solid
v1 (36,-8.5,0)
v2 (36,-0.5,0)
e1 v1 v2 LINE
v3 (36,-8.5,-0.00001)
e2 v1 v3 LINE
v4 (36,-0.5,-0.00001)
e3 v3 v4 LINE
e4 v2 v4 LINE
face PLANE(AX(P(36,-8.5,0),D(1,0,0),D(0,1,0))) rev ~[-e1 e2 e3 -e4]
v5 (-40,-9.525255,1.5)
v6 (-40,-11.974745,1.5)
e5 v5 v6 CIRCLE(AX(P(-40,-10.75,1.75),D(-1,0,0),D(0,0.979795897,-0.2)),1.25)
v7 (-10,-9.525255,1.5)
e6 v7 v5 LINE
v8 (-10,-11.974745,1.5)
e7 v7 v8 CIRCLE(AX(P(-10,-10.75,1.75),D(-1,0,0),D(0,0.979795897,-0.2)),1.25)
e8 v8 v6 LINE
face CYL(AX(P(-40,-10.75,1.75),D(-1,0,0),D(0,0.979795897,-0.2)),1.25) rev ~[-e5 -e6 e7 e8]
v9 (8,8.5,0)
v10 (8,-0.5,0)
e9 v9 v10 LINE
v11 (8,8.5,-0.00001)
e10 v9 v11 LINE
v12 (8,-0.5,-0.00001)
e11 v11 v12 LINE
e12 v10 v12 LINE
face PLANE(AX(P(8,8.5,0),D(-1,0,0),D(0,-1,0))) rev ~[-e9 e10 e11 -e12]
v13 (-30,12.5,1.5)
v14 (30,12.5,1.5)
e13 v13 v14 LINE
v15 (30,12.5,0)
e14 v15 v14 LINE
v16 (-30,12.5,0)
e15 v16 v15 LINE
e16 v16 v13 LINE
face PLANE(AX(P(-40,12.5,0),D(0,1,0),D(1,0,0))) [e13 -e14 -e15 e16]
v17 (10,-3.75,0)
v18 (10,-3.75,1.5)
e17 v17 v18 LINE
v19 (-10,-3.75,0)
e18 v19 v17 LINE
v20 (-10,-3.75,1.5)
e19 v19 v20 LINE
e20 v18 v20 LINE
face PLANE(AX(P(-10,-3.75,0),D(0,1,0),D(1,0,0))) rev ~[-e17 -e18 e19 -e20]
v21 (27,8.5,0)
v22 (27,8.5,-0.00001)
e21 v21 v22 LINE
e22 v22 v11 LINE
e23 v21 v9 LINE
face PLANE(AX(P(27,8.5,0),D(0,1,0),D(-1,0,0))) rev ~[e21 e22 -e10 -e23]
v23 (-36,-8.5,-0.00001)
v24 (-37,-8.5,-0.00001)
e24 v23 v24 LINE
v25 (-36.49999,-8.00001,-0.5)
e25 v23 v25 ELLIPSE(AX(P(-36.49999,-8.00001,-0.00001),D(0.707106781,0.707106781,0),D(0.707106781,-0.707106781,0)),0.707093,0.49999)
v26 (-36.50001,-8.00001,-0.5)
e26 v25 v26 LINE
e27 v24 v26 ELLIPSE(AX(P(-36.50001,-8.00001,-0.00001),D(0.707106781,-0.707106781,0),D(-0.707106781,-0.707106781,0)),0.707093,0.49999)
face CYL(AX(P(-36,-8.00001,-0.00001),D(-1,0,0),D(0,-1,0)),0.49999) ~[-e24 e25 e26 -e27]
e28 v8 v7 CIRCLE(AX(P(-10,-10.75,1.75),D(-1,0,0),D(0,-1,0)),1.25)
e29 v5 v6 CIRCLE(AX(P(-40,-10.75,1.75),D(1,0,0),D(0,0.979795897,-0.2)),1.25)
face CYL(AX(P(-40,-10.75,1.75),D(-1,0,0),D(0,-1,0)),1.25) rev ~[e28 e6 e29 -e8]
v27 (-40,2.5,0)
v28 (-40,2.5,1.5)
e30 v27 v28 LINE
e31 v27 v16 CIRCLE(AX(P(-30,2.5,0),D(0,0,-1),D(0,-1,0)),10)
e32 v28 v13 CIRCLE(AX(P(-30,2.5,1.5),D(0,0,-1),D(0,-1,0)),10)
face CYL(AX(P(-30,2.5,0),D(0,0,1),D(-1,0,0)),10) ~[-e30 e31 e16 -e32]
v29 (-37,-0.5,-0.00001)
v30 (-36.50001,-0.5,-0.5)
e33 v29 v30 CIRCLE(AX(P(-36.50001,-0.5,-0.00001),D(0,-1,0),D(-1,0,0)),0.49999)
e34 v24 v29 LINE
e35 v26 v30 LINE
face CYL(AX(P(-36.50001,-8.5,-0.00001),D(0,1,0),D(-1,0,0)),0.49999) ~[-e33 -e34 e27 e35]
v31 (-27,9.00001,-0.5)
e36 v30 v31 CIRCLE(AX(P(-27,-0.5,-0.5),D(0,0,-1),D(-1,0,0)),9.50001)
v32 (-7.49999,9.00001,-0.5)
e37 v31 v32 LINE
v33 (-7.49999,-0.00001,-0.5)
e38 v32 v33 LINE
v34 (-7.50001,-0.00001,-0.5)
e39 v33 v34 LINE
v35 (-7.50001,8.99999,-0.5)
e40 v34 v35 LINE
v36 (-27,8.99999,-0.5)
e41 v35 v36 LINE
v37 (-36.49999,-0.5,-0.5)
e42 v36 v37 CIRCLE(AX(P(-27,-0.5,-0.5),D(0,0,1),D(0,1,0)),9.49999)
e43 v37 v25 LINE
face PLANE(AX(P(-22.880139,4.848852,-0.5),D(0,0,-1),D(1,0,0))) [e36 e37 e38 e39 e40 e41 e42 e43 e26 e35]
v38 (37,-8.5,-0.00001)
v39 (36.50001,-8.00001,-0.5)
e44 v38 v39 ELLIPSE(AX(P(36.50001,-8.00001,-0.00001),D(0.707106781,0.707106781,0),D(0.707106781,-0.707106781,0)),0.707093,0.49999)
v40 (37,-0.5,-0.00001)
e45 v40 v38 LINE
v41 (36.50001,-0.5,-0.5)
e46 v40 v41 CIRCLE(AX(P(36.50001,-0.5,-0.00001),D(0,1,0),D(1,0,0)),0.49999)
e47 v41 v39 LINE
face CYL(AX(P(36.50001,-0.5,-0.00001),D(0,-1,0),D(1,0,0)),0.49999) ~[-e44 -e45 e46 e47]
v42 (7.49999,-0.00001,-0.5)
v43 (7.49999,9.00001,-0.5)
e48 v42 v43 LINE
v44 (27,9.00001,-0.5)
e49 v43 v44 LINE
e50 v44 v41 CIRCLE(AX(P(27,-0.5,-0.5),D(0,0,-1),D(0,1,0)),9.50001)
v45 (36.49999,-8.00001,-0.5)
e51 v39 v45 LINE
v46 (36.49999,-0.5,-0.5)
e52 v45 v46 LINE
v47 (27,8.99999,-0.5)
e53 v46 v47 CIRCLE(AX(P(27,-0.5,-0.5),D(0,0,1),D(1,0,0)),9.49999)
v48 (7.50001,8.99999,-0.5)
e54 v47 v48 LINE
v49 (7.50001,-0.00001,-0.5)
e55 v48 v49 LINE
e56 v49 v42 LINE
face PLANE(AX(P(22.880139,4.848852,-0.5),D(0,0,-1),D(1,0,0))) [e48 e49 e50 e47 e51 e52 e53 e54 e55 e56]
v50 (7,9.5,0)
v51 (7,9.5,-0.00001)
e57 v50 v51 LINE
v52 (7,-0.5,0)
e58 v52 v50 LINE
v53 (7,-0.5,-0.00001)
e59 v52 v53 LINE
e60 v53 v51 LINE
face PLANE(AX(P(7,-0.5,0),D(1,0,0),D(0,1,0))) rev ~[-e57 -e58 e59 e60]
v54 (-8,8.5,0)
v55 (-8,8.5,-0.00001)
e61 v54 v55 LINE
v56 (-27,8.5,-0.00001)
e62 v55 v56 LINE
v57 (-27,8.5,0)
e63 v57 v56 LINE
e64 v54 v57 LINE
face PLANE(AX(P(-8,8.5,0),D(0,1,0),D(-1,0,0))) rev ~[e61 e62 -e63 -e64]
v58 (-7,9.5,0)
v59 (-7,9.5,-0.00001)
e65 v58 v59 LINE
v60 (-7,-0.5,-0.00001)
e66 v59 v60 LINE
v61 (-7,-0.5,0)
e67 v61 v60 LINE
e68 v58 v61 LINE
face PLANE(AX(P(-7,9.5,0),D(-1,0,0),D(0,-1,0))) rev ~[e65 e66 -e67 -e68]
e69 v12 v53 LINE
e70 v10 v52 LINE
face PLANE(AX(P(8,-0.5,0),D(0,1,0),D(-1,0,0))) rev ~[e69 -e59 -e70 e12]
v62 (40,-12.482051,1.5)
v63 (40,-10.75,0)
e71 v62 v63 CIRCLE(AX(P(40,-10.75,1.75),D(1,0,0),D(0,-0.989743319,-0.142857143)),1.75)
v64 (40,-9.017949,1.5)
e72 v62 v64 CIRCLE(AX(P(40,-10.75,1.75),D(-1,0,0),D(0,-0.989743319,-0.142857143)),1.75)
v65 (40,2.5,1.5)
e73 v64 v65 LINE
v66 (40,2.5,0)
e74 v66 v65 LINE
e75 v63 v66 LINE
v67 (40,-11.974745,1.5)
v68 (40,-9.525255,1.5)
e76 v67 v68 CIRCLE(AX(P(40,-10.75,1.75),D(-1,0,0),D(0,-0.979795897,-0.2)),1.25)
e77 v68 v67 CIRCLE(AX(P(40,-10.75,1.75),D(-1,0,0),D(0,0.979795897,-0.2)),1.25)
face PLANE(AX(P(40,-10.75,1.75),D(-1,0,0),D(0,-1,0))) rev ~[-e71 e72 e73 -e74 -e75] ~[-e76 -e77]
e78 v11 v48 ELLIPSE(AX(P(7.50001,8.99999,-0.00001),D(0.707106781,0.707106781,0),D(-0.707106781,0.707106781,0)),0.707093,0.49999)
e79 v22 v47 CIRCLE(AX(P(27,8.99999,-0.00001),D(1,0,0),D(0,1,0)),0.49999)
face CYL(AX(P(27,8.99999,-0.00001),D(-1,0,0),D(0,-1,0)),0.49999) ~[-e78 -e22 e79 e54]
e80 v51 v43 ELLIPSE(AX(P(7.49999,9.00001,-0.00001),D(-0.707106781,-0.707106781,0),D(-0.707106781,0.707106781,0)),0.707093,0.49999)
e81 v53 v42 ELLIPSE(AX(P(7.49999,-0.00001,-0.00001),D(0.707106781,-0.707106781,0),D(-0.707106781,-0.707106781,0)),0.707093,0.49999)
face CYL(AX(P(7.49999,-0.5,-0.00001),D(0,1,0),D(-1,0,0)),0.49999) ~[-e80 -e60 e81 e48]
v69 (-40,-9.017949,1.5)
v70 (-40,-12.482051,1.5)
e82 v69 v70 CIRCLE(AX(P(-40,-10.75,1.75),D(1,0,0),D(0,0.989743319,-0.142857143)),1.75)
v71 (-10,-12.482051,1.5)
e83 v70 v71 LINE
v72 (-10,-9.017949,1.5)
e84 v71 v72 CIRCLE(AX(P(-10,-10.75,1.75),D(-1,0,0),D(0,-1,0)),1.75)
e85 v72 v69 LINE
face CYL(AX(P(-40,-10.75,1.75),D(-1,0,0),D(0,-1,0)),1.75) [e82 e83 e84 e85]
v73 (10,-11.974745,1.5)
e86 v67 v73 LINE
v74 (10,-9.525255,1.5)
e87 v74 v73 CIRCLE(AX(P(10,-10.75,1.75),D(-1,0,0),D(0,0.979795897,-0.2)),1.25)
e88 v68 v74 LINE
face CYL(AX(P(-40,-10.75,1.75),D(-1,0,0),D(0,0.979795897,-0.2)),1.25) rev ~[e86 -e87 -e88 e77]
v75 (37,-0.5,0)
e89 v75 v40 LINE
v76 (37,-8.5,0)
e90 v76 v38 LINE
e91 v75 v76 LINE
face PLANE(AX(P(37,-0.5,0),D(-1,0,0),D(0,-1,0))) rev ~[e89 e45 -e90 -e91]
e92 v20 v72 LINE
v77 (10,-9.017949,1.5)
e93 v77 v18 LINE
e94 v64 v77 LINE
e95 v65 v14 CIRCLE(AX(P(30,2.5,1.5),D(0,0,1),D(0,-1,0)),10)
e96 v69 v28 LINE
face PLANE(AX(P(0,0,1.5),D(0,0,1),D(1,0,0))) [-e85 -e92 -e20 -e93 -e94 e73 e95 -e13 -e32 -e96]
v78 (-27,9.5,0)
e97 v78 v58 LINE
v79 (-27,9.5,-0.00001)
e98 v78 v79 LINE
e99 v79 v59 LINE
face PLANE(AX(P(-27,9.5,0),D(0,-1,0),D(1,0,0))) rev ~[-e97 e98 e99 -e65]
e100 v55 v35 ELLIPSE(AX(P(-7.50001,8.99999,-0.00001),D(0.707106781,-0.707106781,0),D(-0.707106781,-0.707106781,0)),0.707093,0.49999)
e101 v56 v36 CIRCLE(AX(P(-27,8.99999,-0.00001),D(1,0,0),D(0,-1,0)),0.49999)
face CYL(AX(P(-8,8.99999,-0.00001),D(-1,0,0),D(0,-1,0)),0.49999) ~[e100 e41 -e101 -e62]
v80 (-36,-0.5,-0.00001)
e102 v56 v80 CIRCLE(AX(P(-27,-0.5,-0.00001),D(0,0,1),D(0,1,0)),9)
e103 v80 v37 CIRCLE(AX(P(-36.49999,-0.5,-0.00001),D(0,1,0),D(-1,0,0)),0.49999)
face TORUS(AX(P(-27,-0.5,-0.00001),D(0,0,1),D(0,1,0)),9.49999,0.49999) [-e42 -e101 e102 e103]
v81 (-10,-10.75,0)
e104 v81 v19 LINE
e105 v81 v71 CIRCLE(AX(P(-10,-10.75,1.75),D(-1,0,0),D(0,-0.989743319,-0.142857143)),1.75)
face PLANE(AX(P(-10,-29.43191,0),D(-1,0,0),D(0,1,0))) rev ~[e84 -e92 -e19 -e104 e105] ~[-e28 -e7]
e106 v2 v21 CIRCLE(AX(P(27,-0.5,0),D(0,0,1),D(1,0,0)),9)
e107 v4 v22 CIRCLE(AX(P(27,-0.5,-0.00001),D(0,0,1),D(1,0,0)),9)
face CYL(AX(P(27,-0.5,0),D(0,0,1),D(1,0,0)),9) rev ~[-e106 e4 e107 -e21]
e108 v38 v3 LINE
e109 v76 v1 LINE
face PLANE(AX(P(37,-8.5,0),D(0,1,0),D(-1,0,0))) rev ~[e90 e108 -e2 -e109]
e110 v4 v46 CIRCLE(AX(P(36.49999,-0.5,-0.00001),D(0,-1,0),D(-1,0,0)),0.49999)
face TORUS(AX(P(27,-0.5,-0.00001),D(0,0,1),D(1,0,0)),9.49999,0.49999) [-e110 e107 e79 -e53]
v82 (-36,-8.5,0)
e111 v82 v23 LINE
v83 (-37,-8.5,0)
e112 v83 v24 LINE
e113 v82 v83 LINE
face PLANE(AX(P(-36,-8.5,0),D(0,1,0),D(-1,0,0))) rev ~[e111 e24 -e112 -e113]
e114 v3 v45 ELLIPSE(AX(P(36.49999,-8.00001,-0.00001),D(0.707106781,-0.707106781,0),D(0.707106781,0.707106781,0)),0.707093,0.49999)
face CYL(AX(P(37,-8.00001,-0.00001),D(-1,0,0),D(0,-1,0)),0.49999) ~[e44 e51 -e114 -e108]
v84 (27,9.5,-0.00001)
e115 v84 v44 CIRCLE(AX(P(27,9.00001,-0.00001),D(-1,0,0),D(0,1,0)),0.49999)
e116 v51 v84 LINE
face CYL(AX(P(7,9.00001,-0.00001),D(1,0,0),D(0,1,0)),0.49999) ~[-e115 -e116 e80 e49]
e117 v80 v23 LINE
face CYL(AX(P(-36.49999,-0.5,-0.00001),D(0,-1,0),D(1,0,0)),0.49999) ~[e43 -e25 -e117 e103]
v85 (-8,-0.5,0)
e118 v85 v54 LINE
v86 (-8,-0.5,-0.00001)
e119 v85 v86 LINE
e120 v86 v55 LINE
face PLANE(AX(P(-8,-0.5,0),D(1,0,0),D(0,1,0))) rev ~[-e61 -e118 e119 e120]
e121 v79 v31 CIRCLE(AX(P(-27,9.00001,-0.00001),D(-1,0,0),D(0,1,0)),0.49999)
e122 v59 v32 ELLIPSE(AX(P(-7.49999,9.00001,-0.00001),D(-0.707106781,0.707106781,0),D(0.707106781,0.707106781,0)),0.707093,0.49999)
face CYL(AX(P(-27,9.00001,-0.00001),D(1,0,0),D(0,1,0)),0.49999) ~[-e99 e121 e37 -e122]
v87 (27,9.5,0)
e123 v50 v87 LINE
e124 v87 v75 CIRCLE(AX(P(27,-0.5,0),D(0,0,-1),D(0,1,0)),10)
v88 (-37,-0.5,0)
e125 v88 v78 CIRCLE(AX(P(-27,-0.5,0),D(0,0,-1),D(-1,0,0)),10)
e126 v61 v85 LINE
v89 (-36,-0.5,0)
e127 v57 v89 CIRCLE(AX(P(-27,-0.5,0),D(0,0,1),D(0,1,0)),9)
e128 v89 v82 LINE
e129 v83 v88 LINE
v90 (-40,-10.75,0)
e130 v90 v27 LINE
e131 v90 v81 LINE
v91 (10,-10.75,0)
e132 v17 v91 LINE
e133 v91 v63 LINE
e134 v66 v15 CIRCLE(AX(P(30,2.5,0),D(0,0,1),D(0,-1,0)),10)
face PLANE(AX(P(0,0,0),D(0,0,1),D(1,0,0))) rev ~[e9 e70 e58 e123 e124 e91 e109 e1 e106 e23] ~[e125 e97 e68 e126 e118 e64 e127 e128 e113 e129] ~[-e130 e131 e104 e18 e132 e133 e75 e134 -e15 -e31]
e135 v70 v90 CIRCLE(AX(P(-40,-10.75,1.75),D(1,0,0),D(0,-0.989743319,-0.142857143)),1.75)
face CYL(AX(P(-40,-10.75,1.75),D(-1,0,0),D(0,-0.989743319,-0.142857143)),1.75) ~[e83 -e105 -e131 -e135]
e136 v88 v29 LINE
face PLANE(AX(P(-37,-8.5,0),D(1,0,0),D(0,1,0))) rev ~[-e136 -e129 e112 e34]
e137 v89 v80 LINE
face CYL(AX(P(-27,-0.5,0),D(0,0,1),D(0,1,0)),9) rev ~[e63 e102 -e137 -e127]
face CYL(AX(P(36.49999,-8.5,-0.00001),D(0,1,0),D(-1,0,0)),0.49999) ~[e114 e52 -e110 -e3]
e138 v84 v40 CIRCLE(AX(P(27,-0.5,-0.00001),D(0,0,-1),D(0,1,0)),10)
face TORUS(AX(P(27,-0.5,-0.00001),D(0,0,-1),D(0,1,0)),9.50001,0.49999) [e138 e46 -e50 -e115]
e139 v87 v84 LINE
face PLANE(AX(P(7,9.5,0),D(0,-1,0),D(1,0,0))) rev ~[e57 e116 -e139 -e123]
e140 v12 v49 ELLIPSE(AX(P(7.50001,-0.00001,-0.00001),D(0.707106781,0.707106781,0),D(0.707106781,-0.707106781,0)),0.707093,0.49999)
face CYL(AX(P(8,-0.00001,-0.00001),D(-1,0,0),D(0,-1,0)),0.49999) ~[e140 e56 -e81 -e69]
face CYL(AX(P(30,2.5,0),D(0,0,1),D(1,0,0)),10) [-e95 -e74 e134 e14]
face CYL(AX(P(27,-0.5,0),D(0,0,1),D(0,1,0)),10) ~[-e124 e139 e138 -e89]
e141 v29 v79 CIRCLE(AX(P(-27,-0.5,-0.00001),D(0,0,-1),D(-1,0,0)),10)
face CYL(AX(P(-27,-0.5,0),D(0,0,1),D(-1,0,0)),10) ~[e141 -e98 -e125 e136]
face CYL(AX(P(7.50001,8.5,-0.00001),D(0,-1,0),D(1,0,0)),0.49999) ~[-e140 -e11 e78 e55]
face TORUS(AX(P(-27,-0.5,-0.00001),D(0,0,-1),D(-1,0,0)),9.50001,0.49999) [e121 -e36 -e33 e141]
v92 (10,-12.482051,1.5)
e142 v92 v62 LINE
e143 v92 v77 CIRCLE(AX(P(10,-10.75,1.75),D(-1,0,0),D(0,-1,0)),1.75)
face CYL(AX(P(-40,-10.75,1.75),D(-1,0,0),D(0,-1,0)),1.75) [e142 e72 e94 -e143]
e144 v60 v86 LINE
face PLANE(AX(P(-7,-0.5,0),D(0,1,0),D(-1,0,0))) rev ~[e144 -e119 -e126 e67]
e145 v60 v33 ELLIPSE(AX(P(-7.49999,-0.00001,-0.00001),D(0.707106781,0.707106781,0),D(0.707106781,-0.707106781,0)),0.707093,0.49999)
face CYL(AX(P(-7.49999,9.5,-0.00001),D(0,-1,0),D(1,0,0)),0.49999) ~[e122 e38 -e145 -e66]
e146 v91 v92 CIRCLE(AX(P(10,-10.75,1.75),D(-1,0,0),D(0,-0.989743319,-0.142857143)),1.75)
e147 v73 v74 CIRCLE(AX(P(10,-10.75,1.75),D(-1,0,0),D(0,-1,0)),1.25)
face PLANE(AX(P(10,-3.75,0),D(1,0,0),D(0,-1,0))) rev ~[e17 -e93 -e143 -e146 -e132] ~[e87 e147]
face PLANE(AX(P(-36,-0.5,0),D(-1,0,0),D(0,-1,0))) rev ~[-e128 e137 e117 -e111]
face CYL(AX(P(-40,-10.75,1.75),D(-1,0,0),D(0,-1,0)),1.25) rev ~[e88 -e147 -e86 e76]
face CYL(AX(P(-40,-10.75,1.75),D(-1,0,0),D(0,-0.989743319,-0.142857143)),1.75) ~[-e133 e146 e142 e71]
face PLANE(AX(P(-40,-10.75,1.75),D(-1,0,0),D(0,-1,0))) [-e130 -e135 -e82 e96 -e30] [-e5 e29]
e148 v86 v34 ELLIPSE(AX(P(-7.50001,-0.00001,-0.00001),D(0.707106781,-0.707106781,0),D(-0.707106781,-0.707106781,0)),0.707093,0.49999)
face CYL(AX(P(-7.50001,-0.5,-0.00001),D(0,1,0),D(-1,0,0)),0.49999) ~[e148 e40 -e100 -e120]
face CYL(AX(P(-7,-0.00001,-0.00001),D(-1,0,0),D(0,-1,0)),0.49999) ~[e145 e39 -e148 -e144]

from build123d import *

# Parameters (mm, degrees)
F0_W      = 80
F0_H      = 25
F1_DEPTH  = 1.5
F2_R      = 10
F4_DEPTH  = 80
F3_R      = 1.75
F3_R_2    = 1.25
F5_DEPTH  = 80
F6_DEPTH  = 80
F7_W      = 20
F7_H      = 18.6819097605
F7_H_2    = 7
F8_DEPTH  = 25
F10_DEPTH = 0.5
F11_R     = 0.49999


# Not quite as in the source:
# - a fillet or chamfer is up to 0.001 mm smaller than in the source, because OpenCascade refuses the exact size


with BuildPart() as f1:
    # F0 (on Top) → F1 (new body)
    with BuildSketch(Plane.XY):
        Rectangle(F0_W, F0_H)
    extrude(amount=F1_DEPTH)

    # F2
    f2_edges = [f1.edges().sort_by_distance(p)[0] for p in [
        (-40, 12.5, 0.75),
        (40, 12.5, 0.75),
    ]]
    fillet(f2_edges, radius=F2_R)

    # F3 (on face) → F4 (cut)
    with BuildSketch(Plane(origin=(-40, 0, 0), x_dir=(0, -1, 0), z_dir=(-1, 0, 0))):
        with BuildLine():
            Line((12.5, 1.5), (12.4820508076, 1.5))
            ThreePointArc((12.4820508076, 1.5), (11.8956439237, 0.4271243445), (10.75, 0))
            Line((10.75, 0), (12.5, 0))
            Line((12.5, 0), (12.5, 1.5))
        make_face()
        with BuildLine():
            ThreePointArc((12.4820508076, 1.5), (12.495506934, 1.6246782406), (12.5, 1.75))
            ThreePointArc((12.5, 1.75), (10.6246782406, 3.495506934), (9.0179491924, 1.5))
            Line((9.0179491924, 1.5), (9.5252551286, 1.5))
            ThreePointArc((9.5252551286, 1.5), (10.6243637975, 2.9936701913), (12, 1.75))
            ThreePointArc((12, 1.75), (11.9936701913, 1.6243637975), (11.9747448714, 1.5))
            Line((11.9747448714, 1.5), (12.4820508076, 1.5))
        make_face()
    extrude(amount=-F4_DEPTH, mode=Mode.SUBTRACT)

    # F3 (on face) → F5 (join)
    with BuildSketch(Plane(origin=(-40, 0, 0), x_dir=(0, -1, 0), z_dir=(-1, 0, 0))):
        with Locations((10.75, 1.75)):
            Circle(F3_R)
        with Locations((10.75, 1.75)):
            Circle(F3_R_2, mode=Mode.SUBTRACT)
    extrude(amount=-F5_DEPTH)

    # F3 (on face) → F6 (cut)
    with BuildSketch(Plane(origin=(-40, 0, 0), x_dir=(0, -1, 0), z_dir=(-1, 0, 0))):
        with BuildLine():
            Line((11.9747448714, 1.5), (9.5252551286, 1.5))
            ThreePointArc((9.5252551286, 1.5), (10.75, 0.5), (11.9747448714, 1.5))
        make_face()
        with BuildLine():
            ThreePointArc((12, 1.75), (10.6243637975, 2.9936701913), (9.5252551286, 1.5))
            Line((9.5252551286, 1.5), (11.9747448714, 1.5))
            ThreePointArc((11.9747448714, 1.5), (11.9936701913, 1.6243637975), (12, 1.75))
        make_face()
    extrude(amount=-F6_DEPTH, mode=Mode.SUBTRACT)

    # F7 (on face) → F8 (cut)
    with BuildSketch(Plane(origin=(0, 0, 0), x_dir=(1, 0, 0), z_dir=(0, 0, -1))):
        with Locations((0, 20.0909548802)):
            Rectangle(F7_W, F7_H)
        with Locations((0, 7.25)):
            Rectangle(F7_W, F7_H_2)
    extrude(amount=-F8_DEPTH, mode=Mode.SUBTRACT)

    # F9 (on face) → F10 (join)
    with BuildSketch(Plane(origin=(0, 0, 0), x_dir=(1, 0, 0), z_dir=(0, 0, -1))):
        with BuildLine():
            Line((-36, 8.5), (-37, 8.5))
            Line((-37, 8.5), (-37, 0.5))
            ThreePointArc((-37, 0.5), (-34.0710678119, -6.5710678119), (-27, -9.5))
            Line((-27, -9.5), (-7, -9.5))
            Line((-7, -9.5), (-7, 0.5))
            Line((-7, 0.5), (-8, 0.5))
            Line((-8, 0.5), (-8, -8.5))
            Line((-8, -8.5), (-27, -8.5))
            ThreePointArc((-27, -8.5), (-33.3639610307, -5.8639610307), (-36, 0.5))
            Line((-36, 0.5), (-36, 8.5))
        make_face()
        with BuildLine():
            Line((8, 0.5), (7, 0.5))
            Line((7, 0.5), (7, -9.5))
            Line((7, -9.5), (27, -9.5))
            ThreePointArc((27, -9.5), (34.0710678119, -6.5710678119), (37, 0.5))
            Line((37, 0.5), (37, 8.5))
            Line((37, 8.5), (36, 8.5))
            Line((36, 8.5), (36, 0.5))
            ThreePointArc((36, 0.5), (33.3639610307, -5.8639610307), (27, -8.5))
            Line((27, -8.5), (8, -8.5))
            Line((8, -8.5), (8, 0.5))
        make_face()
    extrude(amount=F10_DEPTH)

    # F11 (radius 0.5 in the source; OpenCascade refuses exactly that, so slightly less here)
    f11_edges = [f1.edges().sort_by_distance(p)[0] for p in [
        (-36, -4.5, -0.5),
        (-36.5, -8.5, -0.5),
        (-37, -4.5, -0.5),
        (-34.071068, 6.571068, -0.5),
        (-17, 9.5, -0.5),
        (-7, 4.5, -0.5),
        (-7.5, -0.5, -0.5),
        (-8, 4, -0.5),
        (-17.5, 8.5, -0.5),
        (-33.363961, 5.863961, -0.5),
        (17.5, 8.5, -0.5),
        (8, 4, -0.5),
        (7.5, -0.5, -0.5),
        (7, 4.5, -0.5),
        (17, 9.5, -0.5),
        (34.071068, 6.571068, -0.5),
        (37, -4.5, -0.5),
        (36.5, -8.5, -0.5),
        (36, -4.5, -0.5),
        (33.363961, 5.863961, -0.5),
    ]]
    fillet(f11_edges, radius=F11_R)


solid = f1.part
